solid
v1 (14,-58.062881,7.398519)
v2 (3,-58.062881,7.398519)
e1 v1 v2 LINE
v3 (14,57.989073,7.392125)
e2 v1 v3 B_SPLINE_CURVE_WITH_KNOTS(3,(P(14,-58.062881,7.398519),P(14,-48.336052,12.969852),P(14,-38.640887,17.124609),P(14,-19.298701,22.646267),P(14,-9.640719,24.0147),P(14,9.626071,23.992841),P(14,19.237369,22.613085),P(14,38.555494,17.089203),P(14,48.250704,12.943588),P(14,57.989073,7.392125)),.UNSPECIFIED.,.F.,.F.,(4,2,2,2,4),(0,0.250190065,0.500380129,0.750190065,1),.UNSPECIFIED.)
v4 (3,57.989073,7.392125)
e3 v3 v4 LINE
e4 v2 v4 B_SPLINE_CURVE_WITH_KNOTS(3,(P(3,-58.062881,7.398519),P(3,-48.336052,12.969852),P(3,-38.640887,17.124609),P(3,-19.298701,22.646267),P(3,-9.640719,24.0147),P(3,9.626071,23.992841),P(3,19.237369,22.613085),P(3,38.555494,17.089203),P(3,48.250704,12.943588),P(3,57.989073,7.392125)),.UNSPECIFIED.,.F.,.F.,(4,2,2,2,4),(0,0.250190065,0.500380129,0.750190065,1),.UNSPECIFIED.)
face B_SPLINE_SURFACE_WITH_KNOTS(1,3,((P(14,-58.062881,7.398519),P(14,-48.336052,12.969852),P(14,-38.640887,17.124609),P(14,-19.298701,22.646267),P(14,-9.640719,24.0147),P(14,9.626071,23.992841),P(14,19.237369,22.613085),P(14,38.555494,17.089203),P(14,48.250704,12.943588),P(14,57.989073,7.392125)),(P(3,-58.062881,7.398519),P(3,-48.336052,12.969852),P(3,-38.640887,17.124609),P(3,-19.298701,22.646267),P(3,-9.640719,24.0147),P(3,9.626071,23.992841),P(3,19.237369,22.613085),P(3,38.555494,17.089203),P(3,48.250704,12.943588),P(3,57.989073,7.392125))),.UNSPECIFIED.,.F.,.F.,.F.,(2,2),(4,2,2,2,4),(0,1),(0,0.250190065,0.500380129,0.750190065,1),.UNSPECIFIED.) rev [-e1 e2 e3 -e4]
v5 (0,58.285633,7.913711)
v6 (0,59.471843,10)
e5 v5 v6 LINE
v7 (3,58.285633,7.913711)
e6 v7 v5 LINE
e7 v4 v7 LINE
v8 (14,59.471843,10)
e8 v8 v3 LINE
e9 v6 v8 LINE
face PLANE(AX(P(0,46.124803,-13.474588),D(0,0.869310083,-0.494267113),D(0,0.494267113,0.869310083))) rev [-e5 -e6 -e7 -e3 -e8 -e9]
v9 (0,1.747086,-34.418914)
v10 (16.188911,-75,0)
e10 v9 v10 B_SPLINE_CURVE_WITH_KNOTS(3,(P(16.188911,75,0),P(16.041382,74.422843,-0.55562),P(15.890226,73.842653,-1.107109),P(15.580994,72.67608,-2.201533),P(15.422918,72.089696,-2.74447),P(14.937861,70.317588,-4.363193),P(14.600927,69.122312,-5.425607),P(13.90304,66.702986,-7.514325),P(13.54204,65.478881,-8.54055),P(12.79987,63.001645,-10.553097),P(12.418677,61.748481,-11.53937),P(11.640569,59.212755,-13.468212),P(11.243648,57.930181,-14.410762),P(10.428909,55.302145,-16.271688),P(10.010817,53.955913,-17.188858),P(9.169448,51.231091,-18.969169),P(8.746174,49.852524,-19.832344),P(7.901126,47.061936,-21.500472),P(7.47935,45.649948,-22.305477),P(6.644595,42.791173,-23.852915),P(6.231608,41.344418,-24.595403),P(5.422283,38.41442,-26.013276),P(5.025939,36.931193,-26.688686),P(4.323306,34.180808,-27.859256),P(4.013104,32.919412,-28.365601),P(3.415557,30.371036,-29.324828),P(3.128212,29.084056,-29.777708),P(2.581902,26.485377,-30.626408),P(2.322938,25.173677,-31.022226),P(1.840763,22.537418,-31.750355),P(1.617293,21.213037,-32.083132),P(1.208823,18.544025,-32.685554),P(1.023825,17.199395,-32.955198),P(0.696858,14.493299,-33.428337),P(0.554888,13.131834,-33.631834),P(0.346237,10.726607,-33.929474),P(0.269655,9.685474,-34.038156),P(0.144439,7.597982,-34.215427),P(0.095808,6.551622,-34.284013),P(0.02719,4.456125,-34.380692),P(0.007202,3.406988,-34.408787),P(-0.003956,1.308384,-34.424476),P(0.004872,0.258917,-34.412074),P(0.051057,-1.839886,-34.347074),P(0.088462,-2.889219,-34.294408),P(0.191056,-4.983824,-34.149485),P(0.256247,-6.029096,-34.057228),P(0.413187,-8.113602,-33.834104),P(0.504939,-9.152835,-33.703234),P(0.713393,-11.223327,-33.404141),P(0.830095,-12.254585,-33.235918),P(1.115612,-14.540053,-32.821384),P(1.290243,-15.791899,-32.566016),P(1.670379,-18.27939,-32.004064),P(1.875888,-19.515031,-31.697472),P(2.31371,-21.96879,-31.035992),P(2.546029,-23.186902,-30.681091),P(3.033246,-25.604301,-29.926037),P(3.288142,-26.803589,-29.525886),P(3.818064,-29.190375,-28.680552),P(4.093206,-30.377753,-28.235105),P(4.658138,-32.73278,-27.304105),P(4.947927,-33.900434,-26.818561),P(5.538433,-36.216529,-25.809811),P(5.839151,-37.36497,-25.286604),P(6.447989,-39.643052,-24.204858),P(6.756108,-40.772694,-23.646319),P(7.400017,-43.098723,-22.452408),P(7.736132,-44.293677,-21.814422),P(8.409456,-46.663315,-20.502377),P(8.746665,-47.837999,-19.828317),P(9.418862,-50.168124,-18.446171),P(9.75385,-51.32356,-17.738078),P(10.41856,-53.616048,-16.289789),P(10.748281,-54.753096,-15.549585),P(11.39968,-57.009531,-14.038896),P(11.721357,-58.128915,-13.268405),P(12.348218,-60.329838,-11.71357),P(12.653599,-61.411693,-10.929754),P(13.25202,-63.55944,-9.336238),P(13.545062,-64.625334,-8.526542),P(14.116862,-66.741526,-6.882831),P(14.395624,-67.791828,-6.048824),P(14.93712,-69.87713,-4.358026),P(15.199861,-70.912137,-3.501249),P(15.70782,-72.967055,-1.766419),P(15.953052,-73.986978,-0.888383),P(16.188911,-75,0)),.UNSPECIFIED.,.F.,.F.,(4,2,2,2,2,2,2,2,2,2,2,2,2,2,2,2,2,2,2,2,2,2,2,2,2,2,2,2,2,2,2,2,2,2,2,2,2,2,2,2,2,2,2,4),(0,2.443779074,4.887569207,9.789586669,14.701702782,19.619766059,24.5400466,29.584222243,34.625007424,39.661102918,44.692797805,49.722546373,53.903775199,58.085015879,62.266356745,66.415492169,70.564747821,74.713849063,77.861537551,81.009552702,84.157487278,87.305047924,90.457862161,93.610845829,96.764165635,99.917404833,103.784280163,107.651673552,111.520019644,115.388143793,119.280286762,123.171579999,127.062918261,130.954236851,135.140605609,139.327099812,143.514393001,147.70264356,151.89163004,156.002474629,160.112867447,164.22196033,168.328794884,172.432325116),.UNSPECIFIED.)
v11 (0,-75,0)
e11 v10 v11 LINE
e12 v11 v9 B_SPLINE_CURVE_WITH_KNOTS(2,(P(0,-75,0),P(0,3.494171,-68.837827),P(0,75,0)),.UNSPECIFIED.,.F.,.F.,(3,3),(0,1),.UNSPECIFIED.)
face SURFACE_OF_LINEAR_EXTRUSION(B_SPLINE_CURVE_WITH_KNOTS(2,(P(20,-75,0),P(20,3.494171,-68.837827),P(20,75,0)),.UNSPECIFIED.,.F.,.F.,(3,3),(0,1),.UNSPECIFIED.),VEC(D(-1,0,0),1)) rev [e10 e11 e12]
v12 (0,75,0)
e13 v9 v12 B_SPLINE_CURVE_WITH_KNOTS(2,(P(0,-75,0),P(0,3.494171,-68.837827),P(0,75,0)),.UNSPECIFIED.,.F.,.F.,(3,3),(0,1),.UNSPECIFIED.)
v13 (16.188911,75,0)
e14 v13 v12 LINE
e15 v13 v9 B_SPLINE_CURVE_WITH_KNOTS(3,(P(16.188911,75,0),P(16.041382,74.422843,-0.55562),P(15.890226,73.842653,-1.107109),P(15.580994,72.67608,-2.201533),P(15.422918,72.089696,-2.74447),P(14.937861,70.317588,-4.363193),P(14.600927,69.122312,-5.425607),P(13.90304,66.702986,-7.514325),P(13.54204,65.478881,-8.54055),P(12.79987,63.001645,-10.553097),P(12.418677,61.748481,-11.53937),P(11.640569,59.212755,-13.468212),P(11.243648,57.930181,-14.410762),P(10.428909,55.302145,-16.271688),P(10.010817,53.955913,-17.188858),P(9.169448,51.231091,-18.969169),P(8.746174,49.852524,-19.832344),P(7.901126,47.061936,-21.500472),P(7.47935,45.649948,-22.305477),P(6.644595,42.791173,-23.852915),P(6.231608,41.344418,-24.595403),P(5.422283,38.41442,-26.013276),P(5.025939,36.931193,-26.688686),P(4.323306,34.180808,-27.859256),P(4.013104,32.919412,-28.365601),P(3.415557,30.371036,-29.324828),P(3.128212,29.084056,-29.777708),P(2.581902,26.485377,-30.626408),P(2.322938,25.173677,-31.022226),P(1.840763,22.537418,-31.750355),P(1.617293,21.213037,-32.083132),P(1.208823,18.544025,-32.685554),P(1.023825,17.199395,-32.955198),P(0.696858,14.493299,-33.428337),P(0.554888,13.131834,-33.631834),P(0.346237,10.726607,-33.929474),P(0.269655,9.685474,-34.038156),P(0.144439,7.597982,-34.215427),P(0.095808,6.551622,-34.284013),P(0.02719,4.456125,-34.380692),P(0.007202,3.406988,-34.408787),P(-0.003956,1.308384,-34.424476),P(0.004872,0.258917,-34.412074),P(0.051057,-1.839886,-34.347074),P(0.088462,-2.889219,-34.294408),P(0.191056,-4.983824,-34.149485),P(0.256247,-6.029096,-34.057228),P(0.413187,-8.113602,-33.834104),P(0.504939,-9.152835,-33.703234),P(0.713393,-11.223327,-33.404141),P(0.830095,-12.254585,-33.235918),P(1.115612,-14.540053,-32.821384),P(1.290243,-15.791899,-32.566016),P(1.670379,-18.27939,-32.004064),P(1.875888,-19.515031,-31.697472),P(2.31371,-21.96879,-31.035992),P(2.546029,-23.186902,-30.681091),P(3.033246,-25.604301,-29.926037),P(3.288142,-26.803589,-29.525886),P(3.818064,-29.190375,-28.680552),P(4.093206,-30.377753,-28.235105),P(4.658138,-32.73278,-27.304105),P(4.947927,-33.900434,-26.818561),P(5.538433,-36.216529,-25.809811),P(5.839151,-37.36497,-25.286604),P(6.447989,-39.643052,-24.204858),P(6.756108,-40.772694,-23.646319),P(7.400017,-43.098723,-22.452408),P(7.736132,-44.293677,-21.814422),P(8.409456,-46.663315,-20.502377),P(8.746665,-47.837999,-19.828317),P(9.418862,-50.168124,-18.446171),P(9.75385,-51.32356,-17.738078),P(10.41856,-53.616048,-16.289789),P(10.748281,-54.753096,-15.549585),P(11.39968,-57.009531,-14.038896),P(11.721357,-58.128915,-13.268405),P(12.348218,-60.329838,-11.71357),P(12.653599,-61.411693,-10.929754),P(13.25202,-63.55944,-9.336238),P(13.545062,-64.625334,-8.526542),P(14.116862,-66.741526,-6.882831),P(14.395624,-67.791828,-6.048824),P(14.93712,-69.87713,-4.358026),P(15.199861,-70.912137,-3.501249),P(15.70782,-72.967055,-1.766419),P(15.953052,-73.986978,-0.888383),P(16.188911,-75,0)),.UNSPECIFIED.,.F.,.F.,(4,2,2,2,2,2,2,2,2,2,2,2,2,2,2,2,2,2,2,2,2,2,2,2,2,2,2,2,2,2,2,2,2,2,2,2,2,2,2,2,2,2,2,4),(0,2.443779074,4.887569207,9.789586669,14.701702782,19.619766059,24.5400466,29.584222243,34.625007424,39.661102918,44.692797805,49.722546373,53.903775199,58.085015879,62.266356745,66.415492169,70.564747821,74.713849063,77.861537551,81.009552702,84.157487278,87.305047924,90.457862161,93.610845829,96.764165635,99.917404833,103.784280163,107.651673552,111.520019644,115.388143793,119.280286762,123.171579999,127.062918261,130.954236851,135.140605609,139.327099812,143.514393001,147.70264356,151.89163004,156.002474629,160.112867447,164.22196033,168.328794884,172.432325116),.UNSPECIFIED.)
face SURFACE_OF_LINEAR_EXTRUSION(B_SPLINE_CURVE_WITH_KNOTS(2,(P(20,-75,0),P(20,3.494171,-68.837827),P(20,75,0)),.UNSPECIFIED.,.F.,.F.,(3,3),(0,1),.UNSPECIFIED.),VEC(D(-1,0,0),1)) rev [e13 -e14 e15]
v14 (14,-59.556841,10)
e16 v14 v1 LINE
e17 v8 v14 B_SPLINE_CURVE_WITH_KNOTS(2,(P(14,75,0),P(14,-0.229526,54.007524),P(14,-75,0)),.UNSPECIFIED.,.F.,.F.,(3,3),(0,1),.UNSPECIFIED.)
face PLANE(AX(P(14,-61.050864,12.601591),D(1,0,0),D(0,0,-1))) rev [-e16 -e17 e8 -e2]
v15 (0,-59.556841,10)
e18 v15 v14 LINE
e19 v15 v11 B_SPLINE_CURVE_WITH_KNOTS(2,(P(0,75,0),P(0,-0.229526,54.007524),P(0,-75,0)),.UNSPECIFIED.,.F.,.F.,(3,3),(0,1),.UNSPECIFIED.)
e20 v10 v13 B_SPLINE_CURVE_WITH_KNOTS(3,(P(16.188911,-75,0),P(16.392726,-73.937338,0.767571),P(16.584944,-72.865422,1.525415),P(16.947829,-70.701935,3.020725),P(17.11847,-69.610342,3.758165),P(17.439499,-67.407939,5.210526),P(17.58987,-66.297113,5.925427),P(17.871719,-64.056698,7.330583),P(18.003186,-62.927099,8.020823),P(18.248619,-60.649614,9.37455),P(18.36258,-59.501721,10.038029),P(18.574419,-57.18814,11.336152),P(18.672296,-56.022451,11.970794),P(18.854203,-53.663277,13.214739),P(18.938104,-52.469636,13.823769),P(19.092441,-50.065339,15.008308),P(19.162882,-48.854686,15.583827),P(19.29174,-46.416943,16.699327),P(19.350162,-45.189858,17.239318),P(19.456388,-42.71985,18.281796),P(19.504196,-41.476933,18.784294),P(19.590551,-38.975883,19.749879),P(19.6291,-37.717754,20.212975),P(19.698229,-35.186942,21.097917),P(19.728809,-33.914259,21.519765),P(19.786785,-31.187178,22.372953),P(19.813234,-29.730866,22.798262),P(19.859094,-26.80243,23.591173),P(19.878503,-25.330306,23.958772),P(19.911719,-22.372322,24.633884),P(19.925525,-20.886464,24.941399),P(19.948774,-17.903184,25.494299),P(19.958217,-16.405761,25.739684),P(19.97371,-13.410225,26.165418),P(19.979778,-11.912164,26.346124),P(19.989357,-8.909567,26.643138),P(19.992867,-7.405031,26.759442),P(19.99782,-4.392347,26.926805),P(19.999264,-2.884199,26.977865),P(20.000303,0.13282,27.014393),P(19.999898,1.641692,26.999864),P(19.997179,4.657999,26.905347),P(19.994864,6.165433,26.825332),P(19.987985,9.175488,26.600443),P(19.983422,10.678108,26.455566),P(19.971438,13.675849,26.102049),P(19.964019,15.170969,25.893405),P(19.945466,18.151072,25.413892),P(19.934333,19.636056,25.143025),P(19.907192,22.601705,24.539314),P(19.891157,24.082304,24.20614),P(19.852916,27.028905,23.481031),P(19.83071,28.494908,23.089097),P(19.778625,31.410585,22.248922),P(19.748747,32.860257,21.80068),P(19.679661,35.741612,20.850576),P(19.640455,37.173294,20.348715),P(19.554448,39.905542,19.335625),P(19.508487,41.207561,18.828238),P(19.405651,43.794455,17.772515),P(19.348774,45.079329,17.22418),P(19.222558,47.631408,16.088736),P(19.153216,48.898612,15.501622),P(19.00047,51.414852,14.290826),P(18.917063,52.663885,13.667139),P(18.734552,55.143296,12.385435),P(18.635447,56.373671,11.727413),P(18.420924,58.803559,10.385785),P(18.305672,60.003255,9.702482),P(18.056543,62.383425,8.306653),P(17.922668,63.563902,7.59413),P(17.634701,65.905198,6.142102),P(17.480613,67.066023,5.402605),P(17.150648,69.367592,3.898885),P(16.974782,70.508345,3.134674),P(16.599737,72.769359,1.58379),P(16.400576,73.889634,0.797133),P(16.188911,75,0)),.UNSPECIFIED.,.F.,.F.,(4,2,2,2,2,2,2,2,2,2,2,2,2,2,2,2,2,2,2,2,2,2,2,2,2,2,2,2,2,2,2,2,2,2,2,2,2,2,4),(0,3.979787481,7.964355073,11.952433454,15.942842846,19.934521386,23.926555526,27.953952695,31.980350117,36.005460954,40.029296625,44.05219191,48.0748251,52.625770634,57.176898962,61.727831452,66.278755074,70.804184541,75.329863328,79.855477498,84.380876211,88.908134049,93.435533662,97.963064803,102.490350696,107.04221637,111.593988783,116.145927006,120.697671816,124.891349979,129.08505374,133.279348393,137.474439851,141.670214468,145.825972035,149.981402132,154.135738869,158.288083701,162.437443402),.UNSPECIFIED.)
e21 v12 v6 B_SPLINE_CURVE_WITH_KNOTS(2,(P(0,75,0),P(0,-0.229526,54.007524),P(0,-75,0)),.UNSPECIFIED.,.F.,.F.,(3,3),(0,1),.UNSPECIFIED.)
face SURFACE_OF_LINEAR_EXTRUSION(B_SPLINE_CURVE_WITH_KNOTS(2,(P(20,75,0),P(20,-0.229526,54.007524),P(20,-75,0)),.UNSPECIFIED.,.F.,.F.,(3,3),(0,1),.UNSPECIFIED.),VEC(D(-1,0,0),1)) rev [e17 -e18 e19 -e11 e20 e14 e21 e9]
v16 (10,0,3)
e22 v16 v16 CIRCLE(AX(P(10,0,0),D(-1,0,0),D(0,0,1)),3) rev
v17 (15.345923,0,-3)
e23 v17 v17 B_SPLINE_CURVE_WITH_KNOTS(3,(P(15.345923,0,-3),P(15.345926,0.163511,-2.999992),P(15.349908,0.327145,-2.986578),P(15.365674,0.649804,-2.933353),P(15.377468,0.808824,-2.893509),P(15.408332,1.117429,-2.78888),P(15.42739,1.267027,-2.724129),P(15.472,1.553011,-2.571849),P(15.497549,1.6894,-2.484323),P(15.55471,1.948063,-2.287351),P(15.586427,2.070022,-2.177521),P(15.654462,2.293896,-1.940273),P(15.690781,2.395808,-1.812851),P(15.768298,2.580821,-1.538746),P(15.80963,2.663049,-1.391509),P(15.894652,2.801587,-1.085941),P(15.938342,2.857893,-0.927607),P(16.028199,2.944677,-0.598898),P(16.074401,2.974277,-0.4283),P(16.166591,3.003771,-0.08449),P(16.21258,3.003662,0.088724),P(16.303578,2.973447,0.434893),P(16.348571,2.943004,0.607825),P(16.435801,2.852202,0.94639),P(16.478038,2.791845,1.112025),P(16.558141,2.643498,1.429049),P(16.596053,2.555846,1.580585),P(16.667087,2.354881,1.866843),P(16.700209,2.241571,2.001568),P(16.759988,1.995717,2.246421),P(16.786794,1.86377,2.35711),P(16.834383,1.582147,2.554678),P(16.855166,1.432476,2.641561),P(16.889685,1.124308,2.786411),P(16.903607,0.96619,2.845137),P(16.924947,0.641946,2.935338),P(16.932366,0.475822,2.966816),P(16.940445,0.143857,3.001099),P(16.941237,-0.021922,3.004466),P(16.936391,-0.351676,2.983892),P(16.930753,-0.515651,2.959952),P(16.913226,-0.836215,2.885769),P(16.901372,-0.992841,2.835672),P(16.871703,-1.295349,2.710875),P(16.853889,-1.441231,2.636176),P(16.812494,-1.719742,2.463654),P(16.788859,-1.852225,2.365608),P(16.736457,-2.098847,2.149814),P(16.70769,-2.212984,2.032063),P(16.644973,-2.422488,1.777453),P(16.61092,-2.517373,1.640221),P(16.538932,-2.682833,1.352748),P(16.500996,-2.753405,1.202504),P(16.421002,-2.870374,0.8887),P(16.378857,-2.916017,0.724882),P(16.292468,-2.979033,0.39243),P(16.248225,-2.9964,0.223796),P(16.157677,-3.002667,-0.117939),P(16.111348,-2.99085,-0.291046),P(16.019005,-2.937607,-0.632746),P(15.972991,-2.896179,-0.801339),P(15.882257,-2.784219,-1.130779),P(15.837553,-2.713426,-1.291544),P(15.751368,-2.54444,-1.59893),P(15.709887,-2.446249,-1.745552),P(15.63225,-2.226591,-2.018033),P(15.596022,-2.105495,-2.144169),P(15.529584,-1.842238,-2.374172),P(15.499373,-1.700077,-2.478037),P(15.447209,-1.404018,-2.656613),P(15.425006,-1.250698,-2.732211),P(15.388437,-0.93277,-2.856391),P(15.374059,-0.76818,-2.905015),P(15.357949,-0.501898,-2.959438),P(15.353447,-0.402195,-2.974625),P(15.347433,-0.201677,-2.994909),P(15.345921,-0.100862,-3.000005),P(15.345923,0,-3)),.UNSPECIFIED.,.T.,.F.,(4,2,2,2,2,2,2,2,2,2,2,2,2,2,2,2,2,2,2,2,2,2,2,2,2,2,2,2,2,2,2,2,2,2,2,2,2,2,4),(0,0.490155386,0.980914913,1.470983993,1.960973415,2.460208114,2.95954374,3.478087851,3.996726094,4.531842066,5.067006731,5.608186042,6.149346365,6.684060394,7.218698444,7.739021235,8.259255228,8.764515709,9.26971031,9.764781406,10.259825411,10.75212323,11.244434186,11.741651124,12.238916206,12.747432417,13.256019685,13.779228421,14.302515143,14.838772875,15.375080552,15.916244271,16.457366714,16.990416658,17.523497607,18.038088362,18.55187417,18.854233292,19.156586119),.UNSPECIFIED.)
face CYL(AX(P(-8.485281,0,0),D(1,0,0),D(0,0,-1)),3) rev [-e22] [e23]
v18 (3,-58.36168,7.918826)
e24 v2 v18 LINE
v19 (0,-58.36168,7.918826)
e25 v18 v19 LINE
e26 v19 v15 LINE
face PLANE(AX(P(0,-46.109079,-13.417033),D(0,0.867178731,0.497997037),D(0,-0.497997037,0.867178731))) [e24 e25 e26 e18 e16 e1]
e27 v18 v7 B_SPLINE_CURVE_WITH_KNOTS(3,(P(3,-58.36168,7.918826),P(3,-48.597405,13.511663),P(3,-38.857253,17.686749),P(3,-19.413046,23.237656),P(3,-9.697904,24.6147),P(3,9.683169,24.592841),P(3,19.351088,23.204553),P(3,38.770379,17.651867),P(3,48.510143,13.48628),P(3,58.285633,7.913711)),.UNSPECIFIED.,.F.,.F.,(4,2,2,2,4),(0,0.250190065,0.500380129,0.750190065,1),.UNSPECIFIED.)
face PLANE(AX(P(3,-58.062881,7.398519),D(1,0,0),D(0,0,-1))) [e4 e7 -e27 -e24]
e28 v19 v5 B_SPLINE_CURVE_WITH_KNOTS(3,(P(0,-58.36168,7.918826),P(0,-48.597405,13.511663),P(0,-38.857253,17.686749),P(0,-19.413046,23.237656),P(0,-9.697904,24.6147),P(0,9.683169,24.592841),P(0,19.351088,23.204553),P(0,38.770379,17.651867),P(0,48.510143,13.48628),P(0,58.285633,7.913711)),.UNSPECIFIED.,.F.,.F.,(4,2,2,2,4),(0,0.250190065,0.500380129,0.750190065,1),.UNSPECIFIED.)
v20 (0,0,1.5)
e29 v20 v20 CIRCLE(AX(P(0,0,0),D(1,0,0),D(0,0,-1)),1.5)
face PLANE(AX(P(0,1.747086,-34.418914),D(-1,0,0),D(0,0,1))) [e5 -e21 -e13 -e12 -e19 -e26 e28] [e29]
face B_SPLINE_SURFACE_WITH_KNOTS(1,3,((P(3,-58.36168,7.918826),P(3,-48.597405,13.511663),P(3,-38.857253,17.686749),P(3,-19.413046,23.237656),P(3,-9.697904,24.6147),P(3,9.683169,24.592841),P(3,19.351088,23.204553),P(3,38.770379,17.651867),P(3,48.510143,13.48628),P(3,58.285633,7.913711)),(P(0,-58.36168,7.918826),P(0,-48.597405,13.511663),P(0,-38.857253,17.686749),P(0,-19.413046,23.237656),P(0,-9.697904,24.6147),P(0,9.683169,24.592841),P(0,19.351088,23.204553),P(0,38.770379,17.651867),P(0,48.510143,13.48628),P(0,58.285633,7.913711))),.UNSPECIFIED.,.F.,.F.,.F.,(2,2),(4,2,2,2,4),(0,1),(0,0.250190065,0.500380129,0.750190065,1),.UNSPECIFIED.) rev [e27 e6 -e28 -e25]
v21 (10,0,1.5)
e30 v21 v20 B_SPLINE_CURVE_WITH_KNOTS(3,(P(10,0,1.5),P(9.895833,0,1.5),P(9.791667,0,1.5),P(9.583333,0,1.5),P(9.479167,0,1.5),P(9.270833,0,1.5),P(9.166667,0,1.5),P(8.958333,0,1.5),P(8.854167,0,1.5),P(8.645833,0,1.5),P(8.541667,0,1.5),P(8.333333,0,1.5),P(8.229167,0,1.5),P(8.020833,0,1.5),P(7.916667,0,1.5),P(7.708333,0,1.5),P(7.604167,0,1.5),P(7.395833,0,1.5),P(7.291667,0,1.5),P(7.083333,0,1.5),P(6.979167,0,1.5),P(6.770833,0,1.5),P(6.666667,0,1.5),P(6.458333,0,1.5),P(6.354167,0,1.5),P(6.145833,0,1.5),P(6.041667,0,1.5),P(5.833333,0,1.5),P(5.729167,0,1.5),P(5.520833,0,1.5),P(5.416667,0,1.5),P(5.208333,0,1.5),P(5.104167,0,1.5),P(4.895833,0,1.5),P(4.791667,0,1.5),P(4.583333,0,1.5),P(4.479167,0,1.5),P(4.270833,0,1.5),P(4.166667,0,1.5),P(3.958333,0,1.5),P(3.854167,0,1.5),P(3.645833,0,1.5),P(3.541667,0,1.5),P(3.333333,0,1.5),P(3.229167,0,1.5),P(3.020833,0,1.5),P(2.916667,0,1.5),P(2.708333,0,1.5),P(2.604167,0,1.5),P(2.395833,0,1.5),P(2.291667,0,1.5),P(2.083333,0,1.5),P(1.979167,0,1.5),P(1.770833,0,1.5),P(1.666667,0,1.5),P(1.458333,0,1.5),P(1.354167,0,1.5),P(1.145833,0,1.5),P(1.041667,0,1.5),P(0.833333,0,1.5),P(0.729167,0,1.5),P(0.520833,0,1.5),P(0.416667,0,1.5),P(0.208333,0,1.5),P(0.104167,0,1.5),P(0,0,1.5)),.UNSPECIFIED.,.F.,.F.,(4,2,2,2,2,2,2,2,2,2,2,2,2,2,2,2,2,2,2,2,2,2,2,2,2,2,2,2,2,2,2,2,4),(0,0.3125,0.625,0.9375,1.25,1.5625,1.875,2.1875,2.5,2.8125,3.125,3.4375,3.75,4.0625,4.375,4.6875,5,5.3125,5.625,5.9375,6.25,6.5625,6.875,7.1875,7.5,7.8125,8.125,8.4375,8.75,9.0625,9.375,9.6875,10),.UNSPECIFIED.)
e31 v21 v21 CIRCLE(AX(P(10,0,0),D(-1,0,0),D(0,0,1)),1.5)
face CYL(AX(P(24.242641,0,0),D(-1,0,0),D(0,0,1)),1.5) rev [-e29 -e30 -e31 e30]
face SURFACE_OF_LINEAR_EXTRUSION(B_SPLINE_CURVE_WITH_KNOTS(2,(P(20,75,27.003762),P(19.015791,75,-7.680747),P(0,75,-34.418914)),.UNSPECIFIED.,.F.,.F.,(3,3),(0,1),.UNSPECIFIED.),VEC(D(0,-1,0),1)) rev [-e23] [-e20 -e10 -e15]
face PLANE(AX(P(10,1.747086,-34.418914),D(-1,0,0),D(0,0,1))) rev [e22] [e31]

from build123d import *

# Parameters (mm, degrees)
BOSS_EXTRUDE1_DEPTH = 20
SKETCH3_R           = 1.5
CUT_EXTRUDE2_DEPTH  = 20
SKETCH4_R           = 3
CUT_EXTRUDE4_DEPTH  = 10
CUT_EXTRUDE1_START  = -75.0000001
CUT_EXTRUDE1_DEPTH  = 150.0000002


# Read off the part's stored shape, not the designer's step: Cut-Extrude1
with BuildPart() as part:
    # Sketch1 → Boss-Extrude1 (new body)
    with BuildSketch(Plane(origin=(0, 0, 0), x_dir=(0, 0, -1), z_dir=(1, 0, 0))):
        with BuildLine():
            add(Edge.make_bspline(
                [(0, -75), (-54.00752431, -0.229525707), (0, 75)],
                knots=[0, 0, 0, 1, 1, 1], degree=2))
            add(Edge.make_bspline(
                [(0, -75), (68.837827029, 3.494171235), (0, 75)],
                knots=[0, 0, 0, 1, 1, 1], degree=2))
        make_face()
    extrude(amount=BOSS_EXTRUDE1_DEPTH)

    # Sketch3 → Cut-Extrude2 (cut)
    with BuildSketch(Plane(origin=(0, 0, 0), x_dir=(0, 0, -1), z_dir=(1, 0, 0))):
        with Locations(Location((0, 0, 0), (0, 0, 180))):
            Circle(SKETCH3_R)
    extrude(amount=CUT_EXTRUDE2_DEPTH, mode=Mode.SUBTRACT)

    # Sketch4 → Cut-Extrude4 (cut)
    with BuildSketch(Plane(origin=(20, 0, 0), x_dir=(0, 0, -1), z_dir=(1, 0, 0))):
        Circle(SKETCH4_R)
    extrude(amount=-CUT_EXTRUDE4_DEPTH, mode=Mode.SUBTRACT)

    # Cut-Extrude1 outline → Cut-Extrude1 (cut)
    with BuildSketch(Plane(origin=(0, 0, 0), x_dir=(0, 0, -1), z_dir=(0, -1, 0)).offset(CUT_EXTRUDE1_START)):
        with BuildLine():
            Line((34.418913514, 0), (34.418913514, 20))
            Line((34.418913514, 20), (-27.003762155, 20))
            add(Edge.make_bspline(
                [(-27.003762155, 20), (7.680747014, 19.015790773), (34.418913514, 0)],
                knots=[0, 0, 0, 1, 1, 1], degree=2))
        make_face()
    extrude(amount=CUT_EXTRUDE1_DEPTH, mode=Mode.SUBTRACT)

    # Cut-Sweep2: sweep along a path in Sketch6
    with BuildLine() as cut_sweep2_path:  # in the path sketch's own coordinates; laid on its plane below (add() does not lay a ready-made edge on the line's plane)
        add(Edge.make_bspline(
            [(10, 59.471843264), (21.504457752, 39.289752245), (32.671682873, -0.43393523), (21.167225121, -40.061270692), (10, -59.556840941)],
            knots=[0.103237719, 0.103237719, 0.103237719, 0.103237719, 0.505901687, 0.896762281, 0.896762281, 0.896762281, 0.896762281], degree=3))
    # Sketch5 → Cut-Sweep2 (sweep, cut)
    with BuildSketch(Plane(origin=(0, 0, 0), x_dir=(1, 0, 0), z_dir=(0, 1, 0))):
        Polygon((14, -30.003762155), (14, -24.003762155), (3, -24.003762155), (3, -24.603762155), (0, -24.603762155), (0, -30.003762155), align=None)
    sweep(path=Plane.ZY * cut_sweep2_path.line, mode=Mode.SUBTRACT)


solid = part.part
